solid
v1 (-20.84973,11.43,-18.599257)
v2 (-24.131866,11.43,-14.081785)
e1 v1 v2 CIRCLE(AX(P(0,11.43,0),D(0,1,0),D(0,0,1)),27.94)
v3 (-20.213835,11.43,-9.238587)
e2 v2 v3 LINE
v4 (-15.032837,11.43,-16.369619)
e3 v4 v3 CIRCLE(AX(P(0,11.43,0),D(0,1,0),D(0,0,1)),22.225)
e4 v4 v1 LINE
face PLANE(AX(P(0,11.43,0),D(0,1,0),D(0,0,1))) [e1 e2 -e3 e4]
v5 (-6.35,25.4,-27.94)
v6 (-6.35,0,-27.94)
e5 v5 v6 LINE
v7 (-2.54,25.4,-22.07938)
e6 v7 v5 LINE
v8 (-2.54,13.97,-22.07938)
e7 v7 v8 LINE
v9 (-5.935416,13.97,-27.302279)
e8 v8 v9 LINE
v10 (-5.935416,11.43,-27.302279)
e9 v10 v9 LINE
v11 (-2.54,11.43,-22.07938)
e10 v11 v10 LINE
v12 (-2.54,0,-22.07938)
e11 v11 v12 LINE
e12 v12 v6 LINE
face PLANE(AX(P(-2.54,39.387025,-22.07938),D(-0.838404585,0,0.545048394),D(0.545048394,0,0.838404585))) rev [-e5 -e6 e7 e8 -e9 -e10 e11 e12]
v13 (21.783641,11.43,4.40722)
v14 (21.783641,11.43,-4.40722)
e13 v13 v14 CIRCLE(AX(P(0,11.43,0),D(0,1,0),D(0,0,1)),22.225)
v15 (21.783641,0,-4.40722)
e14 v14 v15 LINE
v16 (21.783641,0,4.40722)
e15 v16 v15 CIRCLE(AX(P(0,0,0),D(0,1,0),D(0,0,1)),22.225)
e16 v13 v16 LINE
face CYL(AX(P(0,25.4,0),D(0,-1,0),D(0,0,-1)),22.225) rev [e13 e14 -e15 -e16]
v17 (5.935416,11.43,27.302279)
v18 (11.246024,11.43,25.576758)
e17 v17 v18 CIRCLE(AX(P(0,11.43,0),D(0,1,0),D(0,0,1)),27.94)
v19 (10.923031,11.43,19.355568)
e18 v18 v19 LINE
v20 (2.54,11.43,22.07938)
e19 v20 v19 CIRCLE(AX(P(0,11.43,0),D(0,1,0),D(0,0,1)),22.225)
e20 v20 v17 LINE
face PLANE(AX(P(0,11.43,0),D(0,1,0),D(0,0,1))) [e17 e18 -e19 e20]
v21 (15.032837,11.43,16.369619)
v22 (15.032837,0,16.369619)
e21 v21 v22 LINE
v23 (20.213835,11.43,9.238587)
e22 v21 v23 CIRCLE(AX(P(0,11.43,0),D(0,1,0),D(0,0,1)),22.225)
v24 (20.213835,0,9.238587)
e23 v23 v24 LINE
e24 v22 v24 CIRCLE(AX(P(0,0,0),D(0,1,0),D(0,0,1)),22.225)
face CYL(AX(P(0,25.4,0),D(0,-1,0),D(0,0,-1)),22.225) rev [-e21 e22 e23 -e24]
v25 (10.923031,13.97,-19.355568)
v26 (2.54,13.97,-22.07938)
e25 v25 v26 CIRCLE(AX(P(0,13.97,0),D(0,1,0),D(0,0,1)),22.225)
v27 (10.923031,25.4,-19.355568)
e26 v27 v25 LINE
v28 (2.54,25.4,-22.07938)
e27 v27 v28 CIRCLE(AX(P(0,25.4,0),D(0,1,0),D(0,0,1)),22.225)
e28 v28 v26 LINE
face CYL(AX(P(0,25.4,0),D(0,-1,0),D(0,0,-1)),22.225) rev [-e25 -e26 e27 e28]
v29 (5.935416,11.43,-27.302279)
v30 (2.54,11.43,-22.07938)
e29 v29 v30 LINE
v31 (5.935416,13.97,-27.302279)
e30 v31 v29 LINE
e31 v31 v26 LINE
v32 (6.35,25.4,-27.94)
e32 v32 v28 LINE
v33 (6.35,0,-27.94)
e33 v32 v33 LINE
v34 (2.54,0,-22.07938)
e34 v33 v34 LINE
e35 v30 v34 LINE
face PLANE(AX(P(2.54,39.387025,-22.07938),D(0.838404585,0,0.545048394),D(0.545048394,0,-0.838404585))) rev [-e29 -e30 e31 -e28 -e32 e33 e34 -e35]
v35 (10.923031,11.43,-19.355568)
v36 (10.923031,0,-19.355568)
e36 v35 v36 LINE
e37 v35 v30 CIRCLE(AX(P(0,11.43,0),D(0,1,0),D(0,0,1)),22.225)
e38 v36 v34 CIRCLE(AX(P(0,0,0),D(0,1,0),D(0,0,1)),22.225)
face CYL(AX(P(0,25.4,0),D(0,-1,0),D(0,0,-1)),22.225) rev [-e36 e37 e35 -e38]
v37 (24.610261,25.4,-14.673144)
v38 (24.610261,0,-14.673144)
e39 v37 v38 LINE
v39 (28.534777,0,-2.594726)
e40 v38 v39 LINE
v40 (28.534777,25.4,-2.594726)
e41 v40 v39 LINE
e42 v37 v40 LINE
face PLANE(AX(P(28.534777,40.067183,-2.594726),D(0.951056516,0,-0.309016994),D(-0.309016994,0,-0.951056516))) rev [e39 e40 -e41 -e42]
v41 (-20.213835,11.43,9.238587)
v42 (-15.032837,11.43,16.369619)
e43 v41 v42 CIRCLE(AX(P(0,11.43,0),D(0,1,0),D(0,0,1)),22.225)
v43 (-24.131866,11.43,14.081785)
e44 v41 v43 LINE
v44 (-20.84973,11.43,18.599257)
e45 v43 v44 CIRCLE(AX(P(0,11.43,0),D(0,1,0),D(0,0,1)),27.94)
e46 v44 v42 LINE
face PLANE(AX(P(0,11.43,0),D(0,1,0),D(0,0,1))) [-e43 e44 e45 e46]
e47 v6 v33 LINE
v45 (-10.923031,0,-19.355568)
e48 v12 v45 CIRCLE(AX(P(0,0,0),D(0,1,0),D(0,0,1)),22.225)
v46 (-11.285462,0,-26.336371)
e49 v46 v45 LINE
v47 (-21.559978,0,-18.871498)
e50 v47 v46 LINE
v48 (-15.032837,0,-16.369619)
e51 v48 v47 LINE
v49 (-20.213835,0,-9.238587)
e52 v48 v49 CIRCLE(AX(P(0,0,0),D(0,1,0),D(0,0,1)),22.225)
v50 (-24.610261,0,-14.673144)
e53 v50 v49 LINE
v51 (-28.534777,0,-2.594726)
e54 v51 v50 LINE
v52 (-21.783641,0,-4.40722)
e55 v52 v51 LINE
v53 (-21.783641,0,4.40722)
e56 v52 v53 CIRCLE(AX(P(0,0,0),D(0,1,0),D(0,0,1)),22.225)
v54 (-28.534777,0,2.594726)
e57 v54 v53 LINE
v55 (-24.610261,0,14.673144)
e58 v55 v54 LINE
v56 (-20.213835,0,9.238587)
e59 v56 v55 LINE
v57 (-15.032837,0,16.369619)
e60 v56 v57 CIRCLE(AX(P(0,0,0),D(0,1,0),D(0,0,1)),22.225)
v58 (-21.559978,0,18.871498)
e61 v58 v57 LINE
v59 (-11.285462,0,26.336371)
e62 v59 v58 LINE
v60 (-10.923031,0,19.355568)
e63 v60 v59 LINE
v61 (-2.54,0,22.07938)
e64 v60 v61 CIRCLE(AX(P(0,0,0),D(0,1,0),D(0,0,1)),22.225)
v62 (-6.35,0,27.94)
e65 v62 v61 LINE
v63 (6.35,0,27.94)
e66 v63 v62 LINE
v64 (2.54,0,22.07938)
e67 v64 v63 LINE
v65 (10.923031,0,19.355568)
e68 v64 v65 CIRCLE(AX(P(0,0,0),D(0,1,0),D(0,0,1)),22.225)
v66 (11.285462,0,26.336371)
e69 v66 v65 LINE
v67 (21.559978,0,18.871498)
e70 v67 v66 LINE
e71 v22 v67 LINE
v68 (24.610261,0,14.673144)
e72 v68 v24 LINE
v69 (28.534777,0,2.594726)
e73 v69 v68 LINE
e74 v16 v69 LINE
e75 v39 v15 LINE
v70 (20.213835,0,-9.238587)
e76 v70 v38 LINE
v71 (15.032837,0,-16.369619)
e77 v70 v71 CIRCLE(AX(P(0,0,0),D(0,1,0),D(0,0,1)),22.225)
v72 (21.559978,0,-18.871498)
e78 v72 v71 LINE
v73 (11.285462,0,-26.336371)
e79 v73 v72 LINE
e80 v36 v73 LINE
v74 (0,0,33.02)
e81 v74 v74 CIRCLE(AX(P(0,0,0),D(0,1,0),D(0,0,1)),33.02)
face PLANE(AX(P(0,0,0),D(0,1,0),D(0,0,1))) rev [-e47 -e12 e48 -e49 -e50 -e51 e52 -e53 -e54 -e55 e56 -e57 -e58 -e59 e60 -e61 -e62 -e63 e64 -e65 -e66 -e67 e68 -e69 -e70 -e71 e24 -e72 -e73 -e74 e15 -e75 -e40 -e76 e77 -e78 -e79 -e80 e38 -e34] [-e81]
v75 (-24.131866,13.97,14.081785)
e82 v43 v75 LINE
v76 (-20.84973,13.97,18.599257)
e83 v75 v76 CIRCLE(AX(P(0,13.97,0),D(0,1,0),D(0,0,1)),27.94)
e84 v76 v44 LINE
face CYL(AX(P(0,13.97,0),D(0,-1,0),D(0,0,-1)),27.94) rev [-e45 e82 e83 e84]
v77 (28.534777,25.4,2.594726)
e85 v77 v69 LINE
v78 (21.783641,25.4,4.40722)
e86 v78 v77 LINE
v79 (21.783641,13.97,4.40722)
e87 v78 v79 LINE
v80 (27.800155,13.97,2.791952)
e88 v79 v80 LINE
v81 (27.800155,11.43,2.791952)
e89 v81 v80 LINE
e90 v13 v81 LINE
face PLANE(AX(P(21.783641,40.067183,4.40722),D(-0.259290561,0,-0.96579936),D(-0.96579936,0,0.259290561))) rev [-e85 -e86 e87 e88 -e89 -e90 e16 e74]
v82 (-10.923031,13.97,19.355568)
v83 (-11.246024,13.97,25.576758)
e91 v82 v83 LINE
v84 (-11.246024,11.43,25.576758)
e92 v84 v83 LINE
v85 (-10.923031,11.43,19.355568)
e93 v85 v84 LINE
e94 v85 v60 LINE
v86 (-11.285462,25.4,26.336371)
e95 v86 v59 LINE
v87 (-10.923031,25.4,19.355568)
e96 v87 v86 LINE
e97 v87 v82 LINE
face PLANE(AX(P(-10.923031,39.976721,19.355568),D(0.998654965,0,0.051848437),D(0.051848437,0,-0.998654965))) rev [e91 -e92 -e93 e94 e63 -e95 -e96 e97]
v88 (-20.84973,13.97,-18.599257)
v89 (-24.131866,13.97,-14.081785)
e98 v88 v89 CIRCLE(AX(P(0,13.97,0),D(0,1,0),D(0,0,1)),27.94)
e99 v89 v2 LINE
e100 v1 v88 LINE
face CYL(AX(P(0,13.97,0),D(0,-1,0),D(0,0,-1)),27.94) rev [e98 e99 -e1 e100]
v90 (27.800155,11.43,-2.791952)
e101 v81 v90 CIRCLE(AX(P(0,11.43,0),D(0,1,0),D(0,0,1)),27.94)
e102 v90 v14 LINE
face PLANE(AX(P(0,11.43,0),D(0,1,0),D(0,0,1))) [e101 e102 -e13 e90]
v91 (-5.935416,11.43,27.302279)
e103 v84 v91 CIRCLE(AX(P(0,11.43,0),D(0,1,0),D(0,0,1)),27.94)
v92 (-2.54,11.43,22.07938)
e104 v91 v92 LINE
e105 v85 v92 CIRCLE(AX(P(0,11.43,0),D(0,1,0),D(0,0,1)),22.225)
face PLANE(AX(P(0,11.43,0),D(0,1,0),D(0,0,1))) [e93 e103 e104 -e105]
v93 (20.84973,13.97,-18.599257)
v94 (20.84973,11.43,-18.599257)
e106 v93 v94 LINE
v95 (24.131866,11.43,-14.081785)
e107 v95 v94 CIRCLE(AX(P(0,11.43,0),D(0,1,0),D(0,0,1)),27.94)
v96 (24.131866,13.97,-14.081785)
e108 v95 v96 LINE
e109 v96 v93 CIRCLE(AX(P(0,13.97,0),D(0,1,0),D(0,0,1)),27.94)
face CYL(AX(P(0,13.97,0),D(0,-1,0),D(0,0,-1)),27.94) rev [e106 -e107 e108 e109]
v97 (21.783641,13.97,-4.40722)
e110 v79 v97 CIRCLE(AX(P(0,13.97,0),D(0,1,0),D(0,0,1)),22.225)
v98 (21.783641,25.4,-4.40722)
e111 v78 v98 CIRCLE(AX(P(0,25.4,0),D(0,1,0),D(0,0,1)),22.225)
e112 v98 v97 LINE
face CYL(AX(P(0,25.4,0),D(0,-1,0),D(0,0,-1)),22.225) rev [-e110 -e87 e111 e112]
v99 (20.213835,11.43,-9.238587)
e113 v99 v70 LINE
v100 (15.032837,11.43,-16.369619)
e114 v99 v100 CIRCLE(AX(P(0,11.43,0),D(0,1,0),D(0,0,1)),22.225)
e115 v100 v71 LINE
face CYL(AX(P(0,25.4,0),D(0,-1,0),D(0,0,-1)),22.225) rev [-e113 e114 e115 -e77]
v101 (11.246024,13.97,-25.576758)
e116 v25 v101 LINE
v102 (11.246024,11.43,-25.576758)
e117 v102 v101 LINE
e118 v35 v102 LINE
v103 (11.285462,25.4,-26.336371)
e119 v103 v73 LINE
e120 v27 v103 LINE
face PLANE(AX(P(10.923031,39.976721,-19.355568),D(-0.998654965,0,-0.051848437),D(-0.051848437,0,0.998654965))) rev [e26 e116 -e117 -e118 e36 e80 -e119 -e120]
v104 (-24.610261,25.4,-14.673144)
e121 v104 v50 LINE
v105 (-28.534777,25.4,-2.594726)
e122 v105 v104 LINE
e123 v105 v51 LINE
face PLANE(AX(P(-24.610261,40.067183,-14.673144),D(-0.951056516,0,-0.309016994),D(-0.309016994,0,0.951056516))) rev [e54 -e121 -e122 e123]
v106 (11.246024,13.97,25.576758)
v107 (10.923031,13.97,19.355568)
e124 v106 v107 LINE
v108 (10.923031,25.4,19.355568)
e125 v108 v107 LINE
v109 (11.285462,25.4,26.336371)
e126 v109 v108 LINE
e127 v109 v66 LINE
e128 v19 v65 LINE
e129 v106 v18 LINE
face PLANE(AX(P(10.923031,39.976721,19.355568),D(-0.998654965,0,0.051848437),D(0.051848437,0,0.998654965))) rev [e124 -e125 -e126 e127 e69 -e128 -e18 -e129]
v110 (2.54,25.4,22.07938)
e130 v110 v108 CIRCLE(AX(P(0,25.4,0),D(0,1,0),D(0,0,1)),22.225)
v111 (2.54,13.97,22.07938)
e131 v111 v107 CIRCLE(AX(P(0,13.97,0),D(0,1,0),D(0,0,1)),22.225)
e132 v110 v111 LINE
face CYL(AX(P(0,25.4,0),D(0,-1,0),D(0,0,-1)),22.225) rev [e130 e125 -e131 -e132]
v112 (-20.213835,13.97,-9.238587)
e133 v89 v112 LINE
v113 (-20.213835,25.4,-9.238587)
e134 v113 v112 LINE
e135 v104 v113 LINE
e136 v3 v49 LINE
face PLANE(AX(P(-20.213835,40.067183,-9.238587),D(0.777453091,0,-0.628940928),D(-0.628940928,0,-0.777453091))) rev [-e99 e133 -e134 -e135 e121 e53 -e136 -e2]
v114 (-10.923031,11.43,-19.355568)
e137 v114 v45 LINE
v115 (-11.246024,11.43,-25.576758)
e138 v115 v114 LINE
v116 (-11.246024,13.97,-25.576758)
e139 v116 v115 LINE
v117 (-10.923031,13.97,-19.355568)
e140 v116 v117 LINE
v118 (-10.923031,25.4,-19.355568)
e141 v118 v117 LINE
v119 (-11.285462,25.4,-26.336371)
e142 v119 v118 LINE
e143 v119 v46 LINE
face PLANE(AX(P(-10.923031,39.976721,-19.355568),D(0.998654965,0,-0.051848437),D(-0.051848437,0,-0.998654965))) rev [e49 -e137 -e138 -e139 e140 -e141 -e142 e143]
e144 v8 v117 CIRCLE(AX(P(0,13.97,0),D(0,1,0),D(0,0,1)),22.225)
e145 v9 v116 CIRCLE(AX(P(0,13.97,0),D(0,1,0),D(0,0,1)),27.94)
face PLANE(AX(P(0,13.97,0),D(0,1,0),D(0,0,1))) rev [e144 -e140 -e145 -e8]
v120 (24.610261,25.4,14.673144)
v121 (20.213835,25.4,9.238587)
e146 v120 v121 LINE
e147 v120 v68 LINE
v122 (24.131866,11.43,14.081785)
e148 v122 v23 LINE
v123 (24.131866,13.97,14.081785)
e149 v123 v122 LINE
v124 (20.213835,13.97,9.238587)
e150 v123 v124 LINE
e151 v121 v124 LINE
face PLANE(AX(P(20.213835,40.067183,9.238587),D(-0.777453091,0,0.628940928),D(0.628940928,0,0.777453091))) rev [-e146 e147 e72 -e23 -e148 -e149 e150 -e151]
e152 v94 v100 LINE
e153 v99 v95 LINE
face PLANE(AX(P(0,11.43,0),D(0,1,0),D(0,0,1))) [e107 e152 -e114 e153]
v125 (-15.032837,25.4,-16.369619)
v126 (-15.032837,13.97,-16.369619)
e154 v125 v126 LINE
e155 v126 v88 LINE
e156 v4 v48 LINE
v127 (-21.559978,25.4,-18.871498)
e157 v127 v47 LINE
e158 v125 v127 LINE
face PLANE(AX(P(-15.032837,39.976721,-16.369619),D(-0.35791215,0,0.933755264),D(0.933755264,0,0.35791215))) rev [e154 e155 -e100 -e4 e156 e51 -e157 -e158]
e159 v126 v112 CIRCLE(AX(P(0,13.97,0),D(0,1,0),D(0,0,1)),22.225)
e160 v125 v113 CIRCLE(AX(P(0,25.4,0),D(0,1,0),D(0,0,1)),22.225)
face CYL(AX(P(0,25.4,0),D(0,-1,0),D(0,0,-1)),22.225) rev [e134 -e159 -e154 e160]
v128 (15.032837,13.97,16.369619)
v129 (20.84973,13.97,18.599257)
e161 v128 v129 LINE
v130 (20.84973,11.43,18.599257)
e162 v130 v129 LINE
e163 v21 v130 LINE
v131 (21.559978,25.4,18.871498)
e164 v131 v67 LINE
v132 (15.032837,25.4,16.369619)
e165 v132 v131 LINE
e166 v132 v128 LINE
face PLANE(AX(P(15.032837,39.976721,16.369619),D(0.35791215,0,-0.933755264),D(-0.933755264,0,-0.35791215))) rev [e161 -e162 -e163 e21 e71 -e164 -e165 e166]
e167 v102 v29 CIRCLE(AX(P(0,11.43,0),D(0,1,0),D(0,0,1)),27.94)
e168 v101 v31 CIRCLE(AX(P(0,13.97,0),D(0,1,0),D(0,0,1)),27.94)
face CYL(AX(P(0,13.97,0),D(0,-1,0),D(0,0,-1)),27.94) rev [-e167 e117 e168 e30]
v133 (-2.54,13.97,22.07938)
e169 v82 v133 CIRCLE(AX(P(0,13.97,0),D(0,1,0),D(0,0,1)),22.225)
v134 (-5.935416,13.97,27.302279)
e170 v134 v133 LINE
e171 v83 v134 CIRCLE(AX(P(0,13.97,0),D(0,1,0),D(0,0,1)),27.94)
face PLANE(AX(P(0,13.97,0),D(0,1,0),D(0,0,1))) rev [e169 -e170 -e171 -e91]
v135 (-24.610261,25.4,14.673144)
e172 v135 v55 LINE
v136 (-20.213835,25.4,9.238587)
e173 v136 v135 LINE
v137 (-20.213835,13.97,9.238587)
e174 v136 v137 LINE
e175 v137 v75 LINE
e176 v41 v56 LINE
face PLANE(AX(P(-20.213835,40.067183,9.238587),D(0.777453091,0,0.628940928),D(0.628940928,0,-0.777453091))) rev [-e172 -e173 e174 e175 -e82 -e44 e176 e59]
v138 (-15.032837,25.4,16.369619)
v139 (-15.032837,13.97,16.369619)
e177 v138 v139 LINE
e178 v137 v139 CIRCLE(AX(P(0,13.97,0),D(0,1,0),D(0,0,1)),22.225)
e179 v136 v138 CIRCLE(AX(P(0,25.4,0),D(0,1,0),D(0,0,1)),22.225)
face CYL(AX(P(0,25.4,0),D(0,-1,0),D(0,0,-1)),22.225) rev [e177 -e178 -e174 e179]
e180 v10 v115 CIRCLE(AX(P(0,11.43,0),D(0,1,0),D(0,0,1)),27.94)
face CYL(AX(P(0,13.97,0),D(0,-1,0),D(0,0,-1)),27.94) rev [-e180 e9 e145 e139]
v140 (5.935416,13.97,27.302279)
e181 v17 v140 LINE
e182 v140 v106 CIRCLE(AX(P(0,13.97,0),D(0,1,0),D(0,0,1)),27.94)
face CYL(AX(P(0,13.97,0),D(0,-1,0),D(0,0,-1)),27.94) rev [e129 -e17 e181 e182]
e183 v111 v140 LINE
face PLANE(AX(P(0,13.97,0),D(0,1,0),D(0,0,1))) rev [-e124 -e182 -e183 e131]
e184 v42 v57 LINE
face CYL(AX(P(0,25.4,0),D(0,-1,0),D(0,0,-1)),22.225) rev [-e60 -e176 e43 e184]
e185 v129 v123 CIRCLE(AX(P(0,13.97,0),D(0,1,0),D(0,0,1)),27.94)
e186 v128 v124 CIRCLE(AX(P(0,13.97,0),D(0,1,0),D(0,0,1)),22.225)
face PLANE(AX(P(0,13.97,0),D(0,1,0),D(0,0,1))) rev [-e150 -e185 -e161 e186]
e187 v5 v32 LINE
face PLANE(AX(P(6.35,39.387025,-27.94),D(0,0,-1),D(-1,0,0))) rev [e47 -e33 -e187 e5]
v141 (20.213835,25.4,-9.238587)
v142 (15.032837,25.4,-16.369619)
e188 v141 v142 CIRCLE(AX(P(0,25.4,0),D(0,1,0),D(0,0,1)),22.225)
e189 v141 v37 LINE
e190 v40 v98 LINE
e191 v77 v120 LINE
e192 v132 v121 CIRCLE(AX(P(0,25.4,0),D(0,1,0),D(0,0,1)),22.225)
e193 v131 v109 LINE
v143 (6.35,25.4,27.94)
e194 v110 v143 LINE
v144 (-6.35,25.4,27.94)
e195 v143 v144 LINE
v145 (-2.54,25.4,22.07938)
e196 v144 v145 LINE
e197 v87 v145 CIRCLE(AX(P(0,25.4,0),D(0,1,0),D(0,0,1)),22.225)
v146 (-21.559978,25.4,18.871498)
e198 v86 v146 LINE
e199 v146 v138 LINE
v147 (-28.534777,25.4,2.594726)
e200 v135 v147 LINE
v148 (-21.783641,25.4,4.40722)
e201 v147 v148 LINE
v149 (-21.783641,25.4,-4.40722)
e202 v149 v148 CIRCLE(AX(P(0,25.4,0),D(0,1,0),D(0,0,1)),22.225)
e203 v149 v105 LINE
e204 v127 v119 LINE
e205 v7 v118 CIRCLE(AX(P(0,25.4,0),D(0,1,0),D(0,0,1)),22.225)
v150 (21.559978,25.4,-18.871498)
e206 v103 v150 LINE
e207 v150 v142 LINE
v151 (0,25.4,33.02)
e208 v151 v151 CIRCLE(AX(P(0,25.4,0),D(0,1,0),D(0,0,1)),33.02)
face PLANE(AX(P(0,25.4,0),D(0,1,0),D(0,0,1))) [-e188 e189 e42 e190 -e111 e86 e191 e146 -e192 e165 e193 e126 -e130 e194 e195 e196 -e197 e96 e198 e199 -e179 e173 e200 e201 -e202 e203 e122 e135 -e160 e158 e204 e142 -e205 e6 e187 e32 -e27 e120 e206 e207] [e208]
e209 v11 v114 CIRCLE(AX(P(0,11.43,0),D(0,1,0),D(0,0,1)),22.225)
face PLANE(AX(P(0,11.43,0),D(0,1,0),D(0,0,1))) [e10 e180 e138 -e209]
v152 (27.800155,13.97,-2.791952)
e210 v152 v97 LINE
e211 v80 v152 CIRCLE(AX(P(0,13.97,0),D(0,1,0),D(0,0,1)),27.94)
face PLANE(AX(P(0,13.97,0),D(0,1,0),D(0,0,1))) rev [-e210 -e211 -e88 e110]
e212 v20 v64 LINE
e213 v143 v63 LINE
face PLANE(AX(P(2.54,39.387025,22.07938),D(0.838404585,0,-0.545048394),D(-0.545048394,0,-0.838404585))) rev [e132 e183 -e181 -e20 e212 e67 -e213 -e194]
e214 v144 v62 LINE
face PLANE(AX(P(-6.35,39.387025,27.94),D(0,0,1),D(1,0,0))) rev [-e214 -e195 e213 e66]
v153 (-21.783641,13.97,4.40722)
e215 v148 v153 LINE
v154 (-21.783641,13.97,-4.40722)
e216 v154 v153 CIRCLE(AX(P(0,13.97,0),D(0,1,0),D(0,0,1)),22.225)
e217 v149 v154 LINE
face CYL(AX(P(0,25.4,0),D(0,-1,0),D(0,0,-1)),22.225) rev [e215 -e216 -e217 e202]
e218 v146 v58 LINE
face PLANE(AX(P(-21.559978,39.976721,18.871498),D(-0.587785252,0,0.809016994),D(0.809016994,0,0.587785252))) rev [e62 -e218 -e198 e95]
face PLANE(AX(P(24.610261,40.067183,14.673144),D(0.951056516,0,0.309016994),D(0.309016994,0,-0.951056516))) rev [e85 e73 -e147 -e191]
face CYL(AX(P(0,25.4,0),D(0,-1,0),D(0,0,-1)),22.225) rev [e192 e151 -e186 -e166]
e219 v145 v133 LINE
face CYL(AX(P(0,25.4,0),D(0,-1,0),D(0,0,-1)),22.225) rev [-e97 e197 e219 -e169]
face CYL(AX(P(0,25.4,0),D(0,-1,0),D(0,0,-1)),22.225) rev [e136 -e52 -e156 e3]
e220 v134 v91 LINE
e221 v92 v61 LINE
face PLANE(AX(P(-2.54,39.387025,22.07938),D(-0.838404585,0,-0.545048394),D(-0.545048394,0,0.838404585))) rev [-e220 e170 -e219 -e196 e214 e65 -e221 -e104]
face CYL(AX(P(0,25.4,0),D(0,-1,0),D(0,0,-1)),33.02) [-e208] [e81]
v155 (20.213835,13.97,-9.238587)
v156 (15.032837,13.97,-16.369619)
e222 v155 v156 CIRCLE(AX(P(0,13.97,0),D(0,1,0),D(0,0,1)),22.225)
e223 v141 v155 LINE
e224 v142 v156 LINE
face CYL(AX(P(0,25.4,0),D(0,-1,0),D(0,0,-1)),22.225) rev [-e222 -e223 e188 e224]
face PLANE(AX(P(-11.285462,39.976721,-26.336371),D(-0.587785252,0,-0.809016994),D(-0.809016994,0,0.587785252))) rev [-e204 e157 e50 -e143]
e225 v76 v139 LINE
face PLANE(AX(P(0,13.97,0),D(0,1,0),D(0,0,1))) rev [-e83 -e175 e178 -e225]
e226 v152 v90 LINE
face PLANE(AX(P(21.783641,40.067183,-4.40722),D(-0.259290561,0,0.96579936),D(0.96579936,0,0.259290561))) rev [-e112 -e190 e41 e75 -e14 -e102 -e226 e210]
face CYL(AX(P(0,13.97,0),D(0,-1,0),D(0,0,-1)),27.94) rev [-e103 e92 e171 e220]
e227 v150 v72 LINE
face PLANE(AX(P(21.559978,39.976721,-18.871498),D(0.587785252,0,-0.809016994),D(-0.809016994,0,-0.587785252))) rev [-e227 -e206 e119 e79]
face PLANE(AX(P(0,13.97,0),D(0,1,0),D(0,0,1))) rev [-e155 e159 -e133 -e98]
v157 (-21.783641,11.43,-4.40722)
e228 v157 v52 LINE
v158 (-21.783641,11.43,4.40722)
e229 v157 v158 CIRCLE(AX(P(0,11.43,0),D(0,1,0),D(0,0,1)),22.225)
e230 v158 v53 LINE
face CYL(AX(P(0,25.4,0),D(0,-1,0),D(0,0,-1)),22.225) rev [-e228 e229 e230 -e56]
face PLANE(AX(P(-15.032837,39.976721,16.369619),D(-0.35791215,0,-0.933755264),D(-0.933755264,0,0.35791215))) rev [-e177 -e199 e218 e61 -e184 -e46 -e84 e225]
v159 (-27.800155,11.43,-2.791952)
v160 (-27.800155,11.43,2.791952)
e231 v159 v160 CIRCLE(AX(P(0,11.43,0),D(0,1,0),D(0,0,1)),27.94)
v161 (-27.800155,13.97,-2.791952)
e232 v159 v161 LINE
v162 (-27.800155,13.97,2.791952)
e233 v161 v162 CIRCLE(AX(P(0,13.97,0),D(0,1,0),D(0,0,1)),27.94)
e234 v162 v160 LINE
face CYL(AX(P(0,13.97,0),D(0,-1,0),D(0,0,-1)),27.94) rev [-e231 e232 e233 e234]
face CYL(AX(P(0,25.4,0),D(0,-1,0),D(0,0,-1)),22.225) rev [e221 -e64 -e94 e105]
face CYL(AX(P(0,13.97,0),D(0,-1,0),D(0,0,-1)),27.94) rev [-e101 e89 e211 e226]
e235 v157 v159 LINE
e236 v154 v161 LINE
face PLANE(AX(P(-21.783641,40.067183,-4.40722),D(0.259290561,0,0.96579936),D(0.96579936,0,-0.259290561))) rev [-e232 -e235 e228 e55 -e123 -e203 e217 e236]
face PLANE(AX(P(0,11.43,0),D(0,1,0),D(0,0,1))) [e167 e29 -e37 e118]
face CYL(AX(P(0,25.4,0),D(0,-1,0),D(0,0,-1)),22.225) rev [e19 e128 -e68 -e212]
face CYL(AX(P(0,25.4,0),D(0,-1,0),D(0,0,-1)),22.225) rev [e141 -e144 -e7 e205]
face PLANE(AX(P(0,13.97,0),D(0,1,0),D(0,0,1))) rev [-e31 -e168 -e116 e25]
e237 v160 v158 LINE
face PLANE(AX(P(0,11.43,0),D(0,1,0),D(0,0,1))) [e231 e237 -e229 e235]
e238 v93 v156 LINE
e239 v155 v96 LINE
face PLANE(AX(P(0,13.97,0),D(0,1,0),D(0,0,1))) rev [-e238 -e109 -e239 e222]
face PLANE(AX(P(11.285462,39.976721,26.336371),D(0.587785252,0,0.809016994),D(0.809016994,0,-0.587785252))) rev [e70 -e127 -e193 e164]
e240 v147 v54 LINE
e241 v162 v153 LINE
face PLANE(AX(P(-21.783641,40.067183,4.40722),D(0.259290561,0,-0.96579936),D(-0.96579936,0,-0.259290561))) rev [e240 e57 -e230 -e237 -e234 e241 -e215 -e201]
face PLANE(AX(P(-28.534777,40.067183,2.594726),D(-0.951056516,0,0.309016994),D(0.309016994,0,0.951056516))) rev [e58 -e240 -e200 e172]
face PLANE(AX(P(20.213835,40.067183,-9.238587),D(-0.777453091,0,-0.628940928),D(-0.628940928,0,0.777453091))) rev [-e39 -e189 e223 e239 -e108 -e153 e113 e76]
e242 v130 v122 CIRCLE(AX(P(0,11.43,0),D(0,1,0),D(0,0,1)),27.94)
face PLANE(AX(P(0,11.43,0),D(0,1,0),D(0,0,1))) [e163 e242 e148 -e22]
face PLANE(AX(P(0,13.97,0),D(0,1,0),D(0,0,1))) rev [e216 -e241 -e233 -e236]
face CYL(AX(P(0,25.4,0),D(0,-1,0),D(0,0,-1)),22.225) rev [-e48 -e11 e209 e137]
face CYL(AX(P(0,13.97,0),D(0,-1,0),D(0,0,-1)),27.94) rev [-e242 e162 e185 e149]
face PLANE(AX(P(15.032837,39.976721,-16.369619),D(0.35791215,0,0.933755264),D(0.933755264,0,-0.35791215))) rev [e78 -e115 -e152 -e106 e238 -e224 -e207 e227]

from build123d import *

# Parameters (mm, degrees)
SKETCH1_R           = 33.02
SKETCH1_R_2         = 22.225
BOSS_EXTRUDE1_DEPTH = 25.4
CAVITY1_DEPTH       = 25.4
CAVITY1_START       = 11.43
CAVITY1_2_DEPTH     = 2.54


# Read off the part's stored shape, not the designer's step: Cavity1
with BuildPart() as part:
    # Sketch1 → Boss-Extrude1 (new body)
    with BuildSketch(Plane(origin=(0, 0, 0), x_dir=(1, 0, 0), z_dir=(0, 1, 0))):
        with Locations(Location((0, 0, 0), (0, 0, 270))):
            Circle(SKETCH1_R)
        with Locations(Location((0, 0, 0), (0, 0, 270))):
            Circle(SKETCH1_R_2, mode=Mode.SUBTRACT)
    extrude(amount=BOSS_EXTRUDE1_DEPTH)

    # Cavity1 outline → Cavity1 (cut)
    with BuildSketch(Plane(origin=(0, 0, 0), x_dir=(1, 0, 0), z_dir=(0, 1, 0))):
        with BuildLine():
            Line((-6.35, -27.94), (6.35, -27.94))
            Line((6.35, -27.94), (2.54, -22.079380086))
            ThreePointArc((2.54, -22.079380086), (0, -22.225), (-2.54, -22.079380086))
            Line((-2.54, -22.079380086), (-6.35, -27.94))
        make_face()
        with BuildLine():
            Line((10.923030829, -19.355568256), (11.285462035, -26.336371175))
            Line((11.285462035, -26.336371175), (21.559977863, -18.871498471))
            Line((21.559977863, -18.871498471), (15.03283716, -16.369619174))
            ThreePointArc((15.03283716, -16.369619174), (13.063527232, -17.9804027), (10.923030829, -19.355568256))
        make_face()
        with BuildLine():
            Line((-11.285462035, -26.336371175), (-10.923030829, -19.355568256))
            ThreePointArc((-10.923030829, -19.355568256), (-13.063527232, -17.9804027), (-15.03283716, -16.369619174))
            Line((-15.03283716, -16.369619174), (-21.559977863, -18.871498471))
            Line((-21.559977863, -18.871498471), (-11.285462035, -26.336371175))
        make_face()
        with BuildLine():
            ThreePointArc((21.783641473, -4.407220121), (21.137231075, -6.8679027), (20.213835141, -9.238587223))
            Line((20.213835141, -9.238587223), (24.610261151, -14.673143701))
            Line((24.610261151, -14.673143701), (28.53477698, -2.594725944))
            Line((28.53477698, -2.594725944), (21.783641473, -4.407220121))
        make_face()
        with BuildLine():
            Line((-24.610261151, -14.673143701), (-20.213835141, -9.238587223))
            ThreePointArc((-20.213835141, -9.238587223), (-21.137231075, -6.8679027), (-21.783641473, -4.407220121))
            Line((-21.783641473, -4.407220121), (-28.53477698, -2.594725944))
            Line((-28.53477698, -2.594725944), (-24.610261151, -14.673143701))
        make_face()
        with BuildLine():
            Line((-28.53477698, 2.594725944), (-21.783641473, 4.407220121))
            ThreePointArc((-21.783641473, 4.407220121), (-21.137231075, 6.8679027), (-20.213835141, 9.238587223))
            Line((-20.213835141, 9.238587223), (-24.610261151, 14.673143701))
            Line((-24.610261151, 14.673143701), (-28.53477698, 2.594725944))
        make_face()
        with BuildLine():
            Line((21.783641473, 4.407220121), (28.53477698, 2.594725944))
            Line((28.53477698, 2.594725944), (24.610261151, 14.673143701))
            Line((24.610261151, 14.673143701), (20.213835141, 9.238587223))
            ThreePointArc((20.213835141, 9.238587223), (21.137231075, 6.8679027), (21.783641473, 4.407220121))
        make_face()
        with BuildLine():
            Line((-21.559977863, 18.871498471), (-15.03283716, 16.369619174))
            ThreePointArc((-15.03283716, 16.369619174), (-13.063527232, 17.9804027), (-10.923030829, 19.355568256))
            Line((-10.923030829, 19.355568256), (-11.285462035, 26.336371175))
            Line((-11.285462035, 26.336371175), (-21.559977863, 18.871498471))
        make_face()
        with BuildLine():
            ThreePointArc((10.923030829, 19.355568256), (13.063527232, 17.9804027), (15.03283716, 16.369619174))
            Line((15.03283716, 16.369619174), (21.559977863, 18.871498471))
            Line((21.559977863, 18.871498471), (11.285462035, 26.336371175))
            Line((11.285462035, 26.336371175), (10.923030829, 19.355568256))
        make_face()
        with BuildLine():
            Line((-6.35, 27.94), (-2.54, 22.079380086))
            ThreePointArc((-2.54, 22.079380086), (0, 22.225), (2.54, 22.079380086))
            Line((2.54, 22.079380086), (6.35, 27.94))
            Line((6.35, 27.94), (-6.35, 27.94))
        make_face()
    extrude(amount=CAVITY1_DEPTH, mode=Mode.SUBTRACT)

    # Cavity1 2 outline → Cavity1 2 (cut)
    with BuildSketch(Plane(origin=(0, 0, 0), x_dir=(1, 0, 0), z_dir=(0, 1, 0)).offset(CAVITY1_START)):
        with BuildLine():
            Line((2.54, -22.079380086), (5.935416317, -27.3022789))
            ThreePointArc((5.935416317, -27.3022789), (8.633934823, -26.572519065), (11.246024223, -25.576757793))
            Line((11.246024223, -25.576757793), (10.923030829, -19.355568256))
            ThreePointArc((10.923030829, -19.355568256), (6.8679027, -21.137231075), (2.54, -22.079380086))
        make_face()
        with BuildLine():
            ThreePointArc((-11.246024223, -25.576757793), (-8.633934823, -26.572519065), (-5.935416317, -27.3022789))
            Line((-5.935416317, -27.3022789), (-2.54, -22.079380086))
            ThreePointArc((-2.54, -22.079380086), (-6.8679027, -21.137231075), (-10.923030829, -19.355568256))
            Line((-10.923030829, -19.355568256), (-11.246024223, -25.576757793))
        make_face()
        with BuildLine():
            ThreePointArc((20.213835141, -9.238587223), (17.9804027, -13.063527232), (15.03283716, -16.369619174))
            Line((15.03283716, -16.369619174), (20.84972956, -18.599257438))
            ThreePointArc((20.84972956, -18.599257438), (22.603934823, -16.422719949), (24.131865747, -14.08178453))
            Line((24.131865747, -14.08178453), (20.213835141, -9.238587223))
        make_face()
        with BuildLine():
            Line((-20.84972956, -18.599257438), (-15.03283716, -16.369619174))
            ThreePointArc((-15.03283716, -16.369619174), (-17.9804027, -13.063527232), (-20.213835141, -9.238587223))
            Line((-20.213835141, -9.238587223), (-24.131865747, -14.08178453))
            ThreePointArc((-24.131865747, -14.08178453), (-22.603934823, -16.422719949), (-20.84972956, -18.599257438))
        make_face()
        with BuildLine():
            ThreePointArc((21.783641473, 4.407220121), (22.225, 0), (21.783641473, -4.407220121))
            Line((21.783641473, -4.407220121), (27.800154768, -2.7919518))
            ThreePointArc((27.800154768, -2.7919518), (27.94, 0), (27.800154768, 2.7919518))
            Line((27.800154768, 2.7919518), (21.783641473, 4.407220121))
        make_face()
        with BuildLine():
            Line((-27.800154768, -2.7919518), (-21.783641473, -4.407220121))
            ThreePointArc((-21.783641473, -4.407220121), (-22.225, 0), (-21.783641473, 4.407220121))
            Line((-21.783641473, 4.407220121), (-27.800154768, 2.7919518))
            ThreePointArc((-27.800154768, 2.7919518), (-27.94, 0), (-27.800154768, -2.7919518))
        make_face()
        with BuildLine():
            Line((-24.131865747, 14.08178453), (-20.213835141, 9.238587223))
            ThreePointArc((-20.213835141, 9.238587223), (-17.9804027, 13.063527232), (-15.03283716, 16.369619174))
            Line((-15.03283716, 16.369619174), (-20.84972956, 18.599257438))
            ThreePointArc((-20.84972956, 18.599257438), (-22.603934823, 16.422719949), (-24.131865747, 14.08178453))
        make_face()
        with BuildLine():
            ThreePointArc((15.03283716, 16.369619174), (17.9804027, 13.063527232), (20.213835141, 9.238587223))
            Line((20.213835141, 9.238587223), (24.131865747, 14.08178453))
            ThreePointArc((24.131865747, 14.08178453), (22.603934823, 16.422719949), (20.84972956, 18.599257438))
            Line((20.84972956, 18.599257438), (15.03283716, 16.369619174))
        make_face()
        with BuildLine():
            Line((-11.246024223, 25.576757793), (-10.923030829, 19.355568256))
            ThreePointArc((-10.923030829, 19.355568256), (-6.8679027, 21.137231075), (-2.54, 22.079380086))
            Line((-2.54, 22.079380086), (-5.935416317, 27.3022789))
            ThreePointArc((-5.935416317, 27.3022789), (-8.633934823, 26.572519065), (-11.246024223, 25.576757793))
        make_face()
        with BuildLine():
            ThreePointArc((2.54, 22.079380086), (6.8679027, 21.137231075), (10.923030829, 19.355568256))
            Line((10.923030829, 19.355568256), (11.246024223, 25.576757793))
            ThreePointArc((11.246024223, 25.576757793), (8.633934823, 26.572519065), (5.935416317, 27.3022789))
            Line((5.935416317, 27.3022789), (2.54, 22.079380086))
        make_face()
    extrude(amount=CAVITY1_2_DEPTH, mode=Mode.SUBTRACT)


solid = part.part
